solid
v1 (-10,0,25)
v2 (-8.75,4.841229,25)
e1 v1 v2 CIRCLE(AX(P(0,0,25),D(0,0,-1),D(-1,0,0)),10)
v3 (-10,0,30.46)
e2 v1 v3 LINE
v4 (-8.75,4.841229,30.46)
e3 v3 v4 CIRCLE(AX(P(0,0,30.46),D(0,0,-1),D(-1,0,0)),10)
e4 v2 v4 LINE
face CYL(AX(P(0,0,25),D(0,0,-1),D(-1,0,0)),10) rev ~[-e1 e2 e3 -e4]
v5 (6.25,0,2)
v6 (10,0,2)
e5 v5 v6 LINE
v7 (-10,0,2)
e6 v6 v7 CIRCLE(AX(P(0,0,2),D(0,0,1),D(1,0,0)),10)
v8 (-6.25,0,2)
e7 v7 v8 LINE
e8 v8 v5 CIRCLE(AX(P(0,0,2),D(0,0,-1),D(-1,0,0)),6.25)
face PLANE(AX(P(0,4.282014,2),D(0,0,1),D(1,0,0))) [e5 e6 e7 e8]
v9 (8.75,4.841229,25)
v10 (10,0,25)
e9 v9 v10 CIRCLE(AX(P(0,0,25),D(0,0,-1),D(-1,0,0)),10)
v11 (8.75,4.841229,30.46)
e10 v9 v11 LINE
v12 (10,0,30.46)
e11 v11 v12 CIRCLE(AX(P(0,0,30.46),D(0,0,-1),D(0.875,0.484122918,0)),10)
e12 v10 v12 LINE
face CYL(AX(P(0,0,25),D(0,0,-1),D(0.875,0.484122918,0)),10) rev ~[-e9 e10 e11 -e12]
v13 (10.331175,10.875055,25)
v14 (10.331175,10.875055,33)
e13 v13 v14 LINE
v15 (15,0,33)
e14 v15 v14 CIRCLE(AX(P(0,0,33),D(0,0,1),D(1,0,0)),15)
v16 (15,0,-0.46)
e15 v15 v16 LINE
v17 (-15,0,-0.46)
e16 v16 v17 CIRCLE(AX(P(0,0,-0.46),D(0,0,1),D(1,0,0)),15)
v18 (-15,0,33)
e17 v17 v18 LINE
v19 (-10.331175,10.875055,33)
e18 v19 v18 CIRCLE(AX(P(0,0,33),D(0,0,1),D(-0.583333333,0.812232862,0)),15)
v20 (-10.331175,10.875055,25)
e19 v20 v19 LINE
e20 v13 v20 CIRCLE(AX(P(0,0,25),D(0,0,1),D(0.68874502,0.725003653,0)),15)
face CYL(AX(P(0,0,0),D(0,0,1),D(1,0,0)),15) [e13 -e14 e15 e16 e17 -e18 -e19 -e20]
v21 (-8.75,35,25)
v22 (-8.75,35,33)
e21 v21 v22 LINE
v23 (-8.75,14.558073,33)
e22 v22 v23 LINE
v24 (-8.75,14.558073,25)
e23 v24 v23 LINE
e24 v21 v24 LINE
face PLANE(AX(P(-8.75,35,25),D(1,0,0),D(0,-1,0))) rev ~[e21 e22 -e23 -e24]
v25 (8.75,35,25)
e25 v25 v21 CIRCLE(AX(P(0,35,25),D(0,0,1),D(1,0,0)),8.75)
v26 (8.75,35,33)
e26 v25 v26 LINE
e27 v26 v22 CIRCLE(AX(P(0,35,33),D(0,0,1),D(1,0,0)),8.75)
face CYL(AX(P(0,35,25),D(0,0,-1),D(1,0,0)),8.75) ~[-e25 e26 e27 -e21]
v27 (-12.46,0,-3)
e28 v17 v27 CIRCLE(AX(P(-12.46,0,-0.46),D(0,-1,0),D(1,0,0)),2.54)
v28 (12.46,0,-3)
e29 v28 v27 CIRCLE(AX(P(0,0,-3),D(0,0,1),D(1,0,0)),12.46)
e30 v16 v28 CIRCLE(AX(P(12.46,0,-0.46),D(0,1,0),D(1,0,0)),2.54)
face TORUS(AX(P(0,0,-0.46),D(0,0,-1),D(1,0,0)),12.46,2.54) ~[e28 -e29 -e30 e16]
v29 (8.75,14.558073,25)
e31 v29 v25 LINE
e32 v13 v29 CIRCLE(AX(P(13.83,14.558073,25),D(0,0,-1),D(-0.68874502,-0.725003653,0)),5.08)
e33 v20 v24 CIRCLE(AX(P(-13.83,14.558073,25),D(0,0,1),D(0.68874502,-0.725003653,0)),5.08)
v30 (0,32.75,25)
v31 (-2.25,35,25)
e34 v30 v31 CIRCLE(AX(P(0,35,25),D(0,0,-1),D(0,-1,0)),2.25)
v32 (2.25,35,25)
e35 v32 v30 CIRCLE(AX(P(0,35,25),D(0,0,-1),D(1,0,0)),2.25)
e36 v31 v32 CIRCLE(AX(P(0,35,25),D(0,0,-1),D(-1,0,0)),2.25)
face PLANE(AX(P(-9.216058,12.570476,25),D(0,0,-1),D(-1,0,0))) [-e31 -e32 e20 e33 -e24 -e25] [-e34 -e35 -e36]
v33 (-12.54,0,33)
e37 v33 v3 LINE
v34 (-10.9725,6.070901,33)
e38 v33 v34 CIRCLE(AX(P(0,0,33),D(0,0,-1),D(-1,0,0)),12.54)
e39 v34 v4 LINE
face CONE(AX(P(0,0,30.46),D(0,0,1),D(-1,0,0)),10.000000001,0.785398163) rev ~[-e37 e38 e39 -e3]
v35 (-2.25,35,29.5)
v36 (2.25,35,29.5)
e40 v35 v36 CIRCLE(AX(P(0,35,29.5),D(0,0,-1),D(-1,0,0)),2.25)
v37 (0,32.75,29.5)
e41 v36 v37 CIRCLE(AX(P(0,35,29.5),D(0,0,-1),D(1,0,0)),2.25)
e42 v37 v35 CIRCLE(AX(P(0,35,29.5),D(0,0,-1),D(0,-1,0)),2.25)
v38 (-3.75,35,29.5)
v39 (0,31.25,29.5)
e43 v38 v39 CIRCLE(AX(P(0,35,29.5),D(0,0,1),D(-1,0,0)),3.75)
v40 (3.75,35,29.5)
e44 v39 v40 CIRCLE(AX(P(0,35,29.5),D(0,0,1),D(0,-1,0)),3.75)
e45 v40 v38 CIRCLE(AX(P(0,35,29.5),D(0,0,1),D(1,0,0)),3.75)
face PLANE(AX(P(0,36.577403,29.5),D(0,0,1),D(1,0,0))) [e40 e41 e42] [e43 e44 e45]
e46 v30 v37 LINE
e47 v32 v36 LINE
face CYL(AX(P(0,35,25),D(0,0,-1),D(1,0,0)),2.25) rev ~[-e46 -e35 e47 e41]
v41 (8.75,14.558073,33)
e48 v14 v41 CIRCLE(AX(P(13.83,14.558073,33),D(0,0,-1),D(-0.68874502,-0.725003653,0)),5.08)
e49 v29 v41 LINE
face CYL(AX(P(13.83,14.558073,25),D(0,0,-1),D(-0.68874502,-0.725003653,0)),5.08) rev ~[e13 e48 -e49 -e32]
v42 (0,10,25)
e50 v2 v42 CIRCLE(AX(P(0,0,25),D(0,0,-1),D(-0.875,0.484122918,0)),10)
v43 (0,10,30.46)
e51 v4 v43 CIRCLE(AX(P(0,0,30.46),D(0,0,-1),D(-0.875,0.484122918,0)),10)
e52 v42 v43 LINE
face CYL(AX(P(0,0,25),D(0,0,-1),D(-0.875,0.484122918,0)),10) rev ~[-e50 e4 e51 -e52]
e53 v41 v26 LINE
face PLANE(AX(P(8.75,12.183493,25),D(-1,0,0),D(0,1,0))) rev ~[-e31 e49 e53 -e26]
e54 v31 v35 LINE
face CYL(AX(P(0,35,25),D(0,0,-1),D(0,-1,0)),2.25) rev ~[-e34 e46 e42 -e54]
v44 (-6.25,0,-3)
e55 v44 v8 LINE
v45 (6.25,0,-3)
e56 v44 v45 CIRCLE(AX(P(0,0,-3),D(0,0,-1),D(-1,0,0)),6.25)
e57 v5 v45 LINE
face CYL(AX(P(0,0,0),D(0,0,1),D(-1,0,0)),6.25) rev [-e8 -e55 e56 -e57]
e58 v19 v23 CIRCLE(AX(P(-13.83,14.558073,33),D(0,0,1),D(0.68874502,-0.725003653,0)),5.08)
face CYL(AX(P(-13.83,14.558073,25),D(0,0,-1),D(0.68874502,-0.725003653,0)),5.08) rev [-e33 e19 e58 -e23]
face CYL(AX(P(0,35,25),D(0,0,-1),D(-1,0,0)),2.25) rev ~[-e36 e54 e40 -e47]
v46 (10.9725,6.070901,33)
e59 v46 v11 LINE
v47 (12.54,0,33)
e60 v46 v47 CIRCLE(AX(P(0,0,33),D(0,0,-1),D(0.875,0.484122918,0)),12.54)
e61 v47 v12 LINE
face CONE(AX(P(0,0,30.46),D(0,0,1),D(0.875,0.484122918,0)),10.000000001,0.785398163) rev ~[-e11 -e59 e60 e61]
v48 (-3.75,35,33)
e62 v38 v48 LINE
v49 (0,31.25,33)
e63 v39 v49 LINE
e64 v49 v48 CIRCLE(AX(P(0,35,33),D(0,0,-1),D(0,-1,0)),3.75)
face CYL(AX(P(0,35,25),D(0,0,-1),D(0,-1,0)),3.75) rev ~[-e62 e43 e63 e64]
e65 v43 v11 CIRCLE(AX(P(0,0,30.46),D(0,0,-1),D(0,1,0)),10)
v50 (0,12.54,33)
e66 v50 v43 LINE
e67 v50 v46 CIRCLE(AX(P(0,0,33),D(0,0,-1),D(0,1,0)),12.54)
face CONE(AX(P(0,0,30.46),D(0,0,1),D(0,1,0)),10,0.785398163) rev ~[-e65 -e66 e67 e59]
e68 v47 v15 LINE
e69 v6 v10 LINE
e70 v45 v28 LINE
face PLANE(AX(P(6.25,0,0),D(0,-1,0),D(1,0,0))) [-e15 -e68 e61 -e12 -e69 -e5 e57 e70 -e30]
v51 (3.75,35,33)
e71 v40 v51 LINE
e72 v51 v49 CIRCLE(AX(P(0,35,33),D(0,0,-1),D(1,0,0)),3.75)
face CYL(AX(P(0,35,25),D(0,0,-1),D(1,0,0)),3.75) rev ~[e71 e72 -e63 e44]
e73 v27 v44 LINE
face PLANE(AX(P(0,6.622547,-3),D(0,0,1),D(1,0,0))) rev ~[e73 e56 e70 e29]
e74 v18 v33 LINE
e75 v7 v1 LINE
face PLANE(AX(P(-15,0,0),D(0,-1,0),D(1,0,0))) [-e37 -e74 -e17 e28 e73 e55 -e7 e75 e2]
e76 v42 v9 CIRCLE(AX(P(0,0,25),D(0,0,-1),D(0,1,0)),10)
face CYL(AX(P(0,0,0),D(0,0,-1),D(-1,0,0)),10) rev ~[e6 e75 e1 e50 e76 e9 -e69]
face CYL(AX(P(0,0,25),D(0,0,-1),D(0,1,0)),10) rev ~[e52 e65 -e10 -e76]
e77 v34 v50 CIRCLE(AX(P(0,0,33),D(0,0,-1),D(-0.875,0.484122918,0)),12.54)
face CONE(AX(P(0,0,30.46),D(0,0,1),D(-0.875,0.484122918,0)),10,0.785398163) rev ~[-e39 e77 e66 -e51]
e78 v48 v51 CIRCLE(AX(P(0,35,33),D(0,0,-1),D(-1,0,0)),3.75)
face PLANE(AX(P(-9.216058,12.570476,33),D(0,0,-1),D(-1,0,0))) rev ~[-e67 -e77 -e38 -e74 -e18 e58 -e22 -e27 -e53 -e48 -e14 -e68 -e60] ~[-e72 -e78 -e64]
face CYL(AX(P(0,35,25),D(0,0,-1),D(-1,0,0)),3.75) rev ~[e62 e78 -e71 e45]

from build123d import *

# Parameters (mm, degrees)
F1_DEPTH    = 2
F2_DEPTH    = 25
F4_DEPTH    = 8
F5_DEPTH    = 4.5
F6_T1_DEPTH = 8
F7_DEPTH    = 3
F8_R        = 2.54
F9_SIZE     = 2.54


# Not quite as in the source:
# - a fillet or chamfer that OpenCascade refuses, or shapes differently, is made with other operations: its cross-section is extruded or revolved along the edge and cut away or added


with BuildPart() as f1:
    # F0 (on Top) → F1 (new body)
    with BuildSketch(Plane.XY):
        with BuildLine():
            Line((6.25, 0), (10, 0))
            ThreePointArc((10, 0), (0, 10), (-10, 0))
            Line((-10, 0), (-6.25, 0))
            ThreePointArc((-6.25, 0), (0, 6.25), (6.25, 0))
        make_face()
    extrude(amount=F1_DEPTH)

    # F0 (on Top) → F2 (join)
    with BuildSketch(Plane.XY):
        with BuildLine():
            ThreePointArc((-10, 0), (0, 10), (10, 0))
            Line((10, 0), (15, 0))
            ThreePointArc((15, 0), (0, 15), (-15, 0))
            Line((-15, 0), (-10, 0))
        make_face()
    extrude(amount=F2_DEPTH)

    # F3 (on face) → F4 (join)
    with BuildSketch(Plane.XY.offset(25)):
        with BuildLine():
            ThreePointArc((-8.75, 12.183492931), (-4.5960638613, 14.2785222268), (0, 15))
            Line((0, 15), (0, 26.25))
            ThreePointArc((0, 26.25), (-6.1871843354, 28.8128156646), (-8.75, 35))
            Line((-8.75, 35), (-8.75, 12.183492931))
        make_face()
        with BuildLine():
            Line((0, 26.25), (0, 15))
            ThreePointArc((0, 15), (4.5960638613, 14.2785222268), (8.75, 12.183492931))
            Line((8.75, 12.183492931), (8.75, 35))
            ThreePointArc((8.75, 35), (6.1871843354, 28.8128156646), (0, 26.25))
        make_face()
        with BuildLine():
            ThreePointArc((8.75, 35), (0, 43.75), (-8.75, 35))
            Line((-8.75, 35), (-3.75, 35))
            ThreePointArc((-3.75, 35), (0, 38.75), (3.75, 35))
            Line((3.75, 35), (8.75, 35))
        make_face()
        with BuildLine():
            Line((8.75, 12.183492931), (8.75, 4.8412291828))
            ThreePointArc((8.75, 4.8412291828), (9.6824583655, 2.5), (10, 0))
            Line((10, 0), (15, 0))
            ThreePointArc((15, 0), (13.346347815, 6.8465319688), (8.75, 12.183492931))
        make_face()
        with BuildLine():
            ThreePointArc((-10, 0), (-9.6824583655, 2.5), (-8.75, 4.8412291828))
            Line((-8.75, 4.8412291828), (-8.75, 12.183492931))
            ThreePointArc((-8.75, 12.183492931), (-13.346347815, 6.8465319688), (-15, 0))
            Line((-15, 0), (-10, 0))
        make_face()
        with BuildLine():
            Line((0, 15), (0, 10))
            ThreePointArc((0, 10), (5.0787650158, 8.6142989218), (8.75, 4.8412291828))
            Line((8.75, 4.8412291828), (8.75, 12.183492931))
            ThreePointArc((8.75, 12.183492931), (4.5960638613, 14.2785222268), (0, 15))
        make_face()
        with BuildLine():
            ThreePointArc((-8.75, 4.8412291828), (-5.0787650158, 8.6142989218), (0, 10))
            Line((0, 10), (0, 15))
            ThreePointArc((0, 15), (-4.5960638613, 14.2785222268), (-8.75, 12.183492931))
            Line((-8.75, 12.183492931), (-8.75, 4.8412291828))
        make_face()
        with BuildLine():
            ThreePointArc((-8.75, 35), (-6.1871843354, 28.8128156646), (0, 26.25))
            Line((0, 26.25), (0, 31.25))
            ThreePointArc((0, 31.25), (-2.6516504294, 32.3483495706), (-3.75, 35))
            Line((-3.75, 35), (-8.75, 35))
        make_face()
        with BuildLine():
            Line((0, 31.25), (0, 26.25))
            ThreePointArc((0, 26.25), (6.1871843354, 28.8128156646), (8.75, 35))
            Line((8.75, 35), (3.75, 35))
            ThreePointArc((3.75, 35), (2.6516504294, 32.3483495706), (0, 31.25))
        make_face()
    extrude(amount=F4_DEPTH)

    # F3 (on face) → F5 (join)
    with BuildSketch(Plane.XY.offset(25)):
        with BuildLine():
            ThreePointArc((3.75, 35), (0, 38.75), (-3.75, 35))
            Line((-3.75, 35), (-2.25, 35))
            ThreePointArc((-2.25, 35), (0, 37.25), (2.25, 35))
            Line((2.25, 35), (3.75, 35))
        make_face()
        with BuildLine():
            ThreePointArc((-3.75, 35), (-2.6516504294, 32.3483495706), (0, 31.25))
            Line((0, 31.25), (0, 32.75))
            ThreePointArc((0, 32.75), (-1.5909902577, 33.4090097423), (-2.25, 35))
            Line((-2.25, 35), (-3.75, 35))
        make_face()
        with BuildLine():
            Line((0, 32.75), (0, 31.25))
            ThreePointArc((0, 31.25), (2.6516504294, 32.3483495706), (3.75, 35))
            Line((3.75, 35), (2.25, 35))
            ThreePointArc((2.25, 35), (1.5909902577, 33.4090097423), (0, 32.75))
        make_face()
    extrude(amount=F5_DEPTH)

    # F6: fillet of radius 5.08 on 2 edges, made by hand

    # F6_s2 → F6_t1 (join)
    with BuildSketch(Plane.XY.offset(25)):
        with BuildLine():
            ThreePointArc((-10.3311752988, 10.8750548019), (-9.1620009917, 12.5540311317), (-8.75, 14.5580733615))
            Line((-8.75, 14.5580733615), (-8.75, 12.183492931))
            ThreePointArc((-8.75, 12.183492931), (-9.5629919628, 11.5563482433), (-10.3311752988, 10.8750548019))
        make_face()
        with BuildLine():
            ThreePointArc((10.3311752988, 10.8750548019), (9.1620009917, 12.5540311317), (8.75, 14.5580733615))
            Line((8.75, 14.5580733615), (8.75, 12.183492931))
            ThreePointArc((8.75, 12.183492931), (9.5629919628, 11.5563482433), (10.3311752988, 10.8750548019))
        make_face()
    extrude(amount=F6_T1_DEPTH)

    # F7 (add): a face of the model
    f7_faces = [f1.faces().sort_by_distance(p)[0] for p in [
        (0, 7.1463690133, 0),
    ]]
    extrude(f7_faces, amount=F7_DEPTH)

    # F8
    f8_edges = [f1.edges().sort_by_distance(p)[0] for p in [
        (0, 15, -3),
    ]]
    fillet(f8_edges, radius=F8_R)

    # F9
    f9_edges = [f1.edges().sort_by_distance(p)[0] for p in [
        (0, 10, 33),
    ]]
    chamfer(f9_edges, length=F9_SIZE)


solid = f1.part
